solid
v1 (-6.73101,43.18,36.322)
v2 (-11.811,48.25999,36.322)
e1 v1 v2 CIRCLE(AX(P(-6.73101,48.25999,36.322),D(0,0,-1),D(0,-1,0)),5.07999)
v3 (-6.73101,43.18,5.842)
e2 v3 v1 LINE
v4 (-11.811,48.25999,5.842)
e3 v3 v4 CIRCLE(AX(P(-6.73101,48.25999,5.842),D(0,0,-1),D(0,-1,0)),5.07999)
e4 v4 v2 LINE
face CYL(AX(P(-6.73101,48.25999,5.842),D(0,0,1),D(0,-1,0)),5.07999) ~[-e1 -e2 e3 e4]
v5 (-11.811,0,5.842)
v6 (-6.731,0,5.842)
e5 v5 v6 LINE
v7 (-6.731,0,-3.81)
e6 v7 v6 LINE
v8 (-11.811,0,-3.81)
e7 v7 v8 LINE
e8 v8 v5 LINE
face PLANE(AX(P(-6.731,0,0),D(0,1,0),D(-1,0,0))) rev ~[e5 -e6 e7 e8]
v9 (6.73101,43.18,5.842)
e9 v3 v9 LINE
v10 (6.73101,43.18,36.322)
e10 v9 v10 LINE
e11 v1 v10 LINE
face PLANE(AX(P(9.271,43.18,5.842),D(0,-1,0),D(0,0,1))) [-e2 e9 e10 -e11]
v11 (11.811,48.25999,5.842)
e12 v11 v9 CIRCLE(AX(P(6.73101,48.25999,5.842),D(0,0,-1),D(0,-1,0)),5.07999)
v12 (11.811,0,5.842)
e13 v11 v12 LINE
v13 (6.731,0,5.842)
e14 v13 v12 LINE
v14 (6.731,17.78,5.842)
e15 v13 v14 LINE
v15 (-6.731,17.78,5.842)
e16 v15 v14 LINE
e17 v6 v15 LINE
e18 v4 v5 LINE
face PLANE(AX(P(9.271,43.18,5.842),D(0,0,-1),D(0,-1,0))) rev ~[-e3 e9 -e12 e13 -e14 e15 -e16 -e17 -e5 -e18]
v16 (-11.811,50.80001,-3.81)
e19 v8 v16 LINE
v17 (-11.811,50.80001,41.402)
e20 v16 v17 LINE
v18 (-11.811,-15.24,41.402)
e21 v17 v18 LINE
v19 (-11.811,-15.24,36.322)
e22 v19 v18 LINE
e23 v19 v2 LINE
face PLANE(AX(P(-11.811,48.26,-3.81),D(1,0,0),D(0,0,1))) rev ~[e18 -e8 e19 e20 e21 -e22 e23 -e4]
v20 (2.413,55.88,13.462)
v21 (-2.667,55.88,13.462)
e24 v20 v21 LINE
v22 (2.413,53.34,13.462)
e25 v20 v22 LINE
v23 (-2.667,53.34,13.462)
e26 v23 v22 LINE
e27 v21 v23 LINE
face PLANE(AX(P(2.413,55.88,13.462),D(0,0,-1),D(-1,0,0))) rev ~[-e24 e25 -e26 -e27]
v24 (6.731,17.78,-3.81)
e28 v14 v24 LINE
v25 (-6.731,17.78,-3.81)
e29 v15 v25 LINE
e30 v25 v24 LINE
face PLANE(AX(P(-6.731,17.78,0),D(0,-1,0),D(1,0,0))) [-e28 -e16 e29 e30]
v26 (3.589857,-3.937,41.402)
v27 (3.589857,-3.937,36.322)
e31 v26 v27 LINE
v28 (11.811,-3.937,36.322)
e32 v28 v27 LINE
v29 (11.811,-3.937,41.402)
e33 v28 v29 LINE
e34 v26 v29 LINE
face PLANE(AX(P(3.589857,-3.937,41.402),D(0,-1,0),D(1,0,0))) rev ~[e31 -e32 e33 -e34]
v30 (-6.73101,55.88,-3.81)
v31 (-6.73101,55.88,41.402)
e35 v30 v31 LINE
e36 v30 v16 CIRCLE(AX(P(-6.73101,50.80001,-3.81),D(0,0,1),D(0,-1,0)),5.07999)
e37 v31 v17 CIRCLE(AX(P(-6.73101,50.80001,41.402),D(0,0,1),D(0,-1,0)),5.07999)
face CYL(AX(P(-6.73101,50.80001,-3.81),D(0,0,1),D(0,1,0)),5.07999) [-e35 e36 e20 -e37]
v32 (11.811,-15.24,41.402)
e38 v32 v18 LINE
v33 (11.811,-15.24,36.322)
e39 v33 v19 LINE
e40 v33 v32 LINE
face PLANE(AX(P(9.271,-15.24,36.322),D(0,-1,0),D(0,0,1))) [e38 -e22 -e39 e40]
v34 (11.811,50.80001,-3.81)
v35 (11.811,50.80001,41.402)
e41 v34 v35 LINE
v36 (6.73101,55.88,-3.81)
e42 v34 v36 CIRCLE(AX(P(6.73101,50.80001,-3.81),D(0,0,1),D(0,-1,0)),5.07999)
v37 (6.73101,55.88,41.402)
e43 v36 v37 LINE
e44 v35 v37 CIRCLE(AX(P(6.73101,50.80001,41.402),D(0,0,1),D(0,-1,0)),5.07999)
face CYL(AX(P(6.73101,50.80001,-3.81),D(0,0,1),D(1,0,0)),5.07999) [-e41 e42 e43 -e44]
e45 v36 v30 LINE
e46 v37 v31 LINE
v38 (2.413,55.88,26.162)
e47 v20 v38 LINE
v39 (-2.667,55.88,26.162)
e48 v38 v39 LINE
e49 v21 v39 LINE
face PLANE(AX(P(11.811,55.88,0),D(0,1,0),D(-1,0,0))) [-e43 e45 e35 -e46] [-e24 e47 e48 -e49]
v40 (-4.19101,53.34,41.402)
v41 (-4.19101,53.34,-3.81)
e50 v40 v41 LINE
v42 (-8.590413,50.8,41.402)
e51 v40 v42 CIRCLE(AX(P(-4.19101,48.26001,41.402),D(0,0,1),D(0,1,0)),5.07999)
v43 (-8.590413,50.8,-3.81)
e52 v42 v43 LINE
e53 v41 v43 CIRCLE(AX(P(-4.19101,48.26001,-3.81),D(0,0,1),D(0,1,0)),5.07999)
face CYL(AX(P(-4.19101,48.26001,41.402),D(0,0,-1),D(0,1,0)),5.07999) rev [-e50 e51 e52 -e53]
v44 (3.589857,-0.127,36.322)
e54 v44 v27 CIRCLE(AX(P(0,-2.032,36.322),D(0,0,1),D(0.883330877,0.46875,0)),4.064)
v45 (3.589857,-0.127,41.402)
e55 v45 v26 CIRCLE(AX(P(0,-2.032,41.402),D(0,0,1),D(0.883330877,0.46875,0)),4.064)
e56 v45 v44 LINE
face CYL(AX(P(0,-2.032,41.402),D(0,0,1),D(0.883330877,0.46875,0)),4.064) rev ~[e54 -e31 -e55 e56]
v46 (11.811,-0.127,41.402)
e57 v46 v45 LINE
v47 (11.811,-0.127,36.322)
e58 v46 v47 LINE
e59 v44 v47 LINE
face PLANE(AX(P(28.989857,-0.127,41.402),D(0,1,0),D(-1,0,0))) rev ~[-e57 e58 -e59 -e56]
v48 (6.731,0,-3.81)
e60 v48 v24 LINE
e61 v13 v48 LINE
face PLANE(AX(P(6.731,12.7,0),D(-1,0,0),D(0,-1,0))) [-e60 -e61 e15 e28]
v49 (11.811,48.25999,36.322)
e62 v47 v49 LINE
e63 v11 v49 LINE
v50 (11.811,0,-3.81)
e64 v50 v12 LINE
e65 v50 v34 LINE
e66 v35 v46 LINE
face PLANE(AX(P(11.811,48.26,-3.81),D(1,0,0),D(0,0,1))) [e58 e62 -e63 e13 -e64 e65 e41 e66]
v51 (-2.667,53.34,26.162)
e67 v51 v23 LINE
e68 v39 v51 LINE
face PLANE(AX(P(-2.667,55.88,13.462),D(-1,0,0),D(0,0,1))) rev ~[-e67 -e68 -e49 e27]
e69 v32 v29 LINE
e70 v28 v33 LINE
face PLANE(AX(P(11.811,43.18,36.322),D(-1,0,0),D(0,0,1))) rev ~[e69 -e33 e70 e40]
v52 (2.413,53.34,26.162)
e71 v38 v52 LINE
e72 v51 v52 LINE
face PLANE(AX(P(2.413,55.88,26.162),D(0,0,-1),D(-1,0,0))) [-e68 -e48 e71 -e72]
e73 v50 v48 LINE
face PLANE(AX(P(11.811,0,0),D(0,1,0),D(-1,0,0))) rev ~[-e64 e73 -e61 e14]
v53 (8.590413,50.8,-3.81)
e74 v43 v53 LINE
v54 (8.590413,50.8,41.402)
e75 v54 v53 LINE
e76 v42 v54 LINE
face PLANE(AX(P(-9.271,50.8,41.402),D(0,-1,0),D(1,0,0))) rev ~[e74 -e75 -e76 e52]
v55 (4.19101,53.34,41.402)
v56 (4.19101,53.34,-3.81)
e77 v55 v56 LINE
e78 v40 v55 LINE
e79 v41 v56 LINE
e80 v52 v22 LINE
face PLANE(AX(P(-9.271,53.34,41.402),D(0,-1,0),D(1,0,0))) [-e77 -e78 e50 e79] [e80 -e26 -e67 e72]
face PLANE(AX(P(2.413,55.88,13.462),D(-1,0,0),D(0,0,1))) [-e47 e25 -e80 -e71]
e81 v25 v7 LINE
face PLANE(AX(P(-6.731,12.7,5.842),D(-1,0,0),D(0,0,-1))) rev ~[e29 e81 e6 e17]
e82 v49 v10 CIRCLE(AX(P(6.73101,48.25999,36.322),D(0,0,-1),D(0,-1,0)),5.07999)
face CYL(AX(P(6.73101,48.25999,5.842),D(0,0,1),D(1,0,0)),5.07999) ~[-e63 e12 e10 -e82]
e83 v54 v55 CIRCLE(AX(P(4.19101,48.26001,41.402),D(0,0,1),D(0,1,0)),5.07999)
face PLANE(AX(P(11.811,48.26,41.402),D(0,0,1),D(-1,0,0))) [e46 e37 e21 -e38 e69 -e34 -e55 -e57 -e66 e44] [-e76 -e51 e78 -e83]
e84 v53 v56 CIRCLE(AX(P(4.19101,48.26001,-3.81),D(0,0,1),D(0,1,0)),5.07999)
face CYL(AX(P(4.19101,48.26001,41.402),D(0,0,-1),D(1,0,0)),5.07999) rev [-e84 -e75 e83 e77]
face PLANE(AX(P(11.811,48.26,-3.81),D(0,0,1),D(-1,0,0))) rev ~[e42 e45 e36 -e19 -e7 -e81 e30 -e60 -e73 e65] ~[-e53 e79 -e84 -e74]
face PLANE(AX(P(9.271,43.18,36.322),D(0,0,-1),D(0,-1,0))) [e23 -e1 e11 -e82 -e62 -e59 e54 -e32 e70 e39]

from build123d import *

# Parameters (mm, degrees)
F1_DEPTH  = 5.842
F2_DEPTH  = 5.08
F3_W      = 18.542
F3_H      = 5.08
F4_DEPTH  = 35.56
F5_W      = 18.542
F5_H      = 5.08
F6_DEPTH  = 58.42
F8_DEPTH  = 2.54
F9_DEPTH  = 2.54
F7_W      = 19.7188566824
F7_H      = 3.81
F10_DEPTH = 25.4
F11_DEPTH = 3.81
F12_DEPTH = 5.08
F13_DEPTH = 7.62
F14_W     = 18.542
F14_H     = 5.08
F15_DEPTH = 127
F16_R     = 5.07999
F18_DEPTH = 2.54
F19_W     = 5.08
F19_H     = 12.7
F20_DEPTH = 5.08


# Not quite as in the source:
# - two fillets or chamfers of one size are made in one step
# - a fillet or chamfer is up to 0.001 mm smaller than in the source, because OpenCascade refuses the exact size


with BuildPart() as f1:
    # F0 (on Top) → F1 (new body)
    with BuildSketch(Plane.XY):
        Polygon((-9.271, 43.18), (-9.271, 0), (-6.731, 0), (-6.731, 12.7), (6.731, 12.7), (6.731, 0), (9.271, 0), (9.271, 43.18), align=None)
    extrude(amount=F1_DEPTH)

    # F2 (add): a face of the model
    f2_faces = [f1.faces().sort_by_distance(p)[0] for p in [
        (0, 43.18, 2.921),
    ]]
    extrude(f2_faces, amount=F2_DEPTH)

    # F3 (on face) → F4 (join)
    with BuildSketch(Plane.XY.offset(5.842)):
        with Locations((0, 45.72)):
            Rectangle(F3_W, F3_H)
    extrude(amount=F4_DEPTH)

    # F5 (on face) → F6 (join)
    with BuildSketch(Plane.XZ.offset(-43.18)):
        with Locations((0, 38.862)):
            Rectangle(F5_W, F5_H)
    extrude(amount=F6_DEPTH)

    # F8 (add): a face of the model
    f8_faces = [f1.faces().sort_by_distance(p)[0] for p in [
        (-9.271, 0.7580485211, 2.921),
    ]]
    extrude(f8_faces, amount=F8_DEPTH)

    # F9 (add): a face of the model
    f9_faces = [f1.faces().sort_by_distance(p)[0] for p in [
        (9.271, 0.7580485211, 2.921),
    ]]
    extrude(f9_faces, amount=F9_DEPTH)

    # F7 (on face) → F10 (cut)
    with BuildSketch(Plane.XY.offset(41.402)):
        with BuildLine():
            ThreePointArc((3.5898566824, -0.127), (3.9436831489, -1.0504404137), (4.064, -2.032))
            ThreePointArc((4.064, -2.032), (3.9436831489, -3.0135595863), (3.5898566824, -3.937))
            Line((3.5898566824, -3.937), (9.271, -3.937))
            Line((9.271, -3.937), (9.271, -0.127))
            Line((9.271, -0.127), (3.5898566824, -0.127))
        make_face()
        with BuildLine():
            Line((3.5898566824, -3.937), (3.5898566824, -0.127))
            ThreePointArc((3.5898566824, -0.127), (-4.064, -2.032), (3.5898566824, -3.937))
        make_face()
        with BuildLine():
            ThreePointArc((3.5898566824, -3.937), (3.9436831489, -3.0135595863), (4.064, -2.032))
            ThreePointArc((4.064, -2.032), (3.9436831489, -1.0504404137), (3.5898566824, -0.127))
            Line((3.5898566824, -0.127), (3.5898566824, -3.937))
        make_face()
        with Locations((19.1304283412, -2.032)):
            Rectangle(F7_W, F7_H)
    extrude(amount=-F10_DEPTH, mode=Mode.SUBTRACT)

    # F11 (add): a face of the model
    f11_faces = [f1.faces().sort_by_distance(p)[0] for p in [
        (0, 27.2669507324, 0),
    ]]
    extrude(f11_faces, amount=F11_DEPTH)

    # F12 (cut): a face of the model
    f12_faces = [f1.faces().sort_by_distance(p)[0] for p in [
        (0, 12.7, 1.016),
    ]]
    extrude(f12_faces, amount=-F12_DEPTH, mode=Mode.SUBTRACT)

    # F13 (add): a face of the model
    f13_faces = [f1.faces().sort_by_distance(p)[0] for p in [
        (0, 48.26, 18.796),
    ]]
    extrude(f13_faces, amount=F13_DEPTH)

    # F14 (on face) → F15 (cut)
    with BuildSketch(Plane.XY.offset(41.402)):
        with Locations((0, 50.8)):
            Rectangle(F14_W, F14_H)
    extrude(amount=-F15_DEPTH, mode=Mode.SUBTRACT)

    # F16 (radius 5.08 in the source; OpenCascade refuses exactly that, so slightly less here)
    f16_edges = [f1.edges().sort_by_distance(p)[0] for p in [
        (9.271, 53.34, 18.796),
        (-9.271, 53.34, 18.796),
        (-11.811, 55.88, 18.796),
        (-11.811, 43.18, 21.082),
        (11.811, 43.18, 21.082),
        (11.811, 55.88, 18.796),
    ]]
    fillet(f16_edges, radius=F16_R)

    # F18 (add): a face of the model
    f18_faces = [f1.faces().sort_by_distance(p)[0] for p in [
        (0, 48.26, 18.796),
    ]]
    extrude(f18_faces, amount=F18_DEPTH)

    # F19 (on face) → F20 (cut)
    with BuildSketch(Plane(origin=(0, 55.88, 0), x_dir=(-1, 0, 0), z_dir=(0, 1, 0))):
        with Locations((0.127, 19.812)):
            Rectangle(F19_W, F19_H)
    extrude(amount=-F20_DEPTH, mode=Mode.SUBTRACT)


solid = f1.part
